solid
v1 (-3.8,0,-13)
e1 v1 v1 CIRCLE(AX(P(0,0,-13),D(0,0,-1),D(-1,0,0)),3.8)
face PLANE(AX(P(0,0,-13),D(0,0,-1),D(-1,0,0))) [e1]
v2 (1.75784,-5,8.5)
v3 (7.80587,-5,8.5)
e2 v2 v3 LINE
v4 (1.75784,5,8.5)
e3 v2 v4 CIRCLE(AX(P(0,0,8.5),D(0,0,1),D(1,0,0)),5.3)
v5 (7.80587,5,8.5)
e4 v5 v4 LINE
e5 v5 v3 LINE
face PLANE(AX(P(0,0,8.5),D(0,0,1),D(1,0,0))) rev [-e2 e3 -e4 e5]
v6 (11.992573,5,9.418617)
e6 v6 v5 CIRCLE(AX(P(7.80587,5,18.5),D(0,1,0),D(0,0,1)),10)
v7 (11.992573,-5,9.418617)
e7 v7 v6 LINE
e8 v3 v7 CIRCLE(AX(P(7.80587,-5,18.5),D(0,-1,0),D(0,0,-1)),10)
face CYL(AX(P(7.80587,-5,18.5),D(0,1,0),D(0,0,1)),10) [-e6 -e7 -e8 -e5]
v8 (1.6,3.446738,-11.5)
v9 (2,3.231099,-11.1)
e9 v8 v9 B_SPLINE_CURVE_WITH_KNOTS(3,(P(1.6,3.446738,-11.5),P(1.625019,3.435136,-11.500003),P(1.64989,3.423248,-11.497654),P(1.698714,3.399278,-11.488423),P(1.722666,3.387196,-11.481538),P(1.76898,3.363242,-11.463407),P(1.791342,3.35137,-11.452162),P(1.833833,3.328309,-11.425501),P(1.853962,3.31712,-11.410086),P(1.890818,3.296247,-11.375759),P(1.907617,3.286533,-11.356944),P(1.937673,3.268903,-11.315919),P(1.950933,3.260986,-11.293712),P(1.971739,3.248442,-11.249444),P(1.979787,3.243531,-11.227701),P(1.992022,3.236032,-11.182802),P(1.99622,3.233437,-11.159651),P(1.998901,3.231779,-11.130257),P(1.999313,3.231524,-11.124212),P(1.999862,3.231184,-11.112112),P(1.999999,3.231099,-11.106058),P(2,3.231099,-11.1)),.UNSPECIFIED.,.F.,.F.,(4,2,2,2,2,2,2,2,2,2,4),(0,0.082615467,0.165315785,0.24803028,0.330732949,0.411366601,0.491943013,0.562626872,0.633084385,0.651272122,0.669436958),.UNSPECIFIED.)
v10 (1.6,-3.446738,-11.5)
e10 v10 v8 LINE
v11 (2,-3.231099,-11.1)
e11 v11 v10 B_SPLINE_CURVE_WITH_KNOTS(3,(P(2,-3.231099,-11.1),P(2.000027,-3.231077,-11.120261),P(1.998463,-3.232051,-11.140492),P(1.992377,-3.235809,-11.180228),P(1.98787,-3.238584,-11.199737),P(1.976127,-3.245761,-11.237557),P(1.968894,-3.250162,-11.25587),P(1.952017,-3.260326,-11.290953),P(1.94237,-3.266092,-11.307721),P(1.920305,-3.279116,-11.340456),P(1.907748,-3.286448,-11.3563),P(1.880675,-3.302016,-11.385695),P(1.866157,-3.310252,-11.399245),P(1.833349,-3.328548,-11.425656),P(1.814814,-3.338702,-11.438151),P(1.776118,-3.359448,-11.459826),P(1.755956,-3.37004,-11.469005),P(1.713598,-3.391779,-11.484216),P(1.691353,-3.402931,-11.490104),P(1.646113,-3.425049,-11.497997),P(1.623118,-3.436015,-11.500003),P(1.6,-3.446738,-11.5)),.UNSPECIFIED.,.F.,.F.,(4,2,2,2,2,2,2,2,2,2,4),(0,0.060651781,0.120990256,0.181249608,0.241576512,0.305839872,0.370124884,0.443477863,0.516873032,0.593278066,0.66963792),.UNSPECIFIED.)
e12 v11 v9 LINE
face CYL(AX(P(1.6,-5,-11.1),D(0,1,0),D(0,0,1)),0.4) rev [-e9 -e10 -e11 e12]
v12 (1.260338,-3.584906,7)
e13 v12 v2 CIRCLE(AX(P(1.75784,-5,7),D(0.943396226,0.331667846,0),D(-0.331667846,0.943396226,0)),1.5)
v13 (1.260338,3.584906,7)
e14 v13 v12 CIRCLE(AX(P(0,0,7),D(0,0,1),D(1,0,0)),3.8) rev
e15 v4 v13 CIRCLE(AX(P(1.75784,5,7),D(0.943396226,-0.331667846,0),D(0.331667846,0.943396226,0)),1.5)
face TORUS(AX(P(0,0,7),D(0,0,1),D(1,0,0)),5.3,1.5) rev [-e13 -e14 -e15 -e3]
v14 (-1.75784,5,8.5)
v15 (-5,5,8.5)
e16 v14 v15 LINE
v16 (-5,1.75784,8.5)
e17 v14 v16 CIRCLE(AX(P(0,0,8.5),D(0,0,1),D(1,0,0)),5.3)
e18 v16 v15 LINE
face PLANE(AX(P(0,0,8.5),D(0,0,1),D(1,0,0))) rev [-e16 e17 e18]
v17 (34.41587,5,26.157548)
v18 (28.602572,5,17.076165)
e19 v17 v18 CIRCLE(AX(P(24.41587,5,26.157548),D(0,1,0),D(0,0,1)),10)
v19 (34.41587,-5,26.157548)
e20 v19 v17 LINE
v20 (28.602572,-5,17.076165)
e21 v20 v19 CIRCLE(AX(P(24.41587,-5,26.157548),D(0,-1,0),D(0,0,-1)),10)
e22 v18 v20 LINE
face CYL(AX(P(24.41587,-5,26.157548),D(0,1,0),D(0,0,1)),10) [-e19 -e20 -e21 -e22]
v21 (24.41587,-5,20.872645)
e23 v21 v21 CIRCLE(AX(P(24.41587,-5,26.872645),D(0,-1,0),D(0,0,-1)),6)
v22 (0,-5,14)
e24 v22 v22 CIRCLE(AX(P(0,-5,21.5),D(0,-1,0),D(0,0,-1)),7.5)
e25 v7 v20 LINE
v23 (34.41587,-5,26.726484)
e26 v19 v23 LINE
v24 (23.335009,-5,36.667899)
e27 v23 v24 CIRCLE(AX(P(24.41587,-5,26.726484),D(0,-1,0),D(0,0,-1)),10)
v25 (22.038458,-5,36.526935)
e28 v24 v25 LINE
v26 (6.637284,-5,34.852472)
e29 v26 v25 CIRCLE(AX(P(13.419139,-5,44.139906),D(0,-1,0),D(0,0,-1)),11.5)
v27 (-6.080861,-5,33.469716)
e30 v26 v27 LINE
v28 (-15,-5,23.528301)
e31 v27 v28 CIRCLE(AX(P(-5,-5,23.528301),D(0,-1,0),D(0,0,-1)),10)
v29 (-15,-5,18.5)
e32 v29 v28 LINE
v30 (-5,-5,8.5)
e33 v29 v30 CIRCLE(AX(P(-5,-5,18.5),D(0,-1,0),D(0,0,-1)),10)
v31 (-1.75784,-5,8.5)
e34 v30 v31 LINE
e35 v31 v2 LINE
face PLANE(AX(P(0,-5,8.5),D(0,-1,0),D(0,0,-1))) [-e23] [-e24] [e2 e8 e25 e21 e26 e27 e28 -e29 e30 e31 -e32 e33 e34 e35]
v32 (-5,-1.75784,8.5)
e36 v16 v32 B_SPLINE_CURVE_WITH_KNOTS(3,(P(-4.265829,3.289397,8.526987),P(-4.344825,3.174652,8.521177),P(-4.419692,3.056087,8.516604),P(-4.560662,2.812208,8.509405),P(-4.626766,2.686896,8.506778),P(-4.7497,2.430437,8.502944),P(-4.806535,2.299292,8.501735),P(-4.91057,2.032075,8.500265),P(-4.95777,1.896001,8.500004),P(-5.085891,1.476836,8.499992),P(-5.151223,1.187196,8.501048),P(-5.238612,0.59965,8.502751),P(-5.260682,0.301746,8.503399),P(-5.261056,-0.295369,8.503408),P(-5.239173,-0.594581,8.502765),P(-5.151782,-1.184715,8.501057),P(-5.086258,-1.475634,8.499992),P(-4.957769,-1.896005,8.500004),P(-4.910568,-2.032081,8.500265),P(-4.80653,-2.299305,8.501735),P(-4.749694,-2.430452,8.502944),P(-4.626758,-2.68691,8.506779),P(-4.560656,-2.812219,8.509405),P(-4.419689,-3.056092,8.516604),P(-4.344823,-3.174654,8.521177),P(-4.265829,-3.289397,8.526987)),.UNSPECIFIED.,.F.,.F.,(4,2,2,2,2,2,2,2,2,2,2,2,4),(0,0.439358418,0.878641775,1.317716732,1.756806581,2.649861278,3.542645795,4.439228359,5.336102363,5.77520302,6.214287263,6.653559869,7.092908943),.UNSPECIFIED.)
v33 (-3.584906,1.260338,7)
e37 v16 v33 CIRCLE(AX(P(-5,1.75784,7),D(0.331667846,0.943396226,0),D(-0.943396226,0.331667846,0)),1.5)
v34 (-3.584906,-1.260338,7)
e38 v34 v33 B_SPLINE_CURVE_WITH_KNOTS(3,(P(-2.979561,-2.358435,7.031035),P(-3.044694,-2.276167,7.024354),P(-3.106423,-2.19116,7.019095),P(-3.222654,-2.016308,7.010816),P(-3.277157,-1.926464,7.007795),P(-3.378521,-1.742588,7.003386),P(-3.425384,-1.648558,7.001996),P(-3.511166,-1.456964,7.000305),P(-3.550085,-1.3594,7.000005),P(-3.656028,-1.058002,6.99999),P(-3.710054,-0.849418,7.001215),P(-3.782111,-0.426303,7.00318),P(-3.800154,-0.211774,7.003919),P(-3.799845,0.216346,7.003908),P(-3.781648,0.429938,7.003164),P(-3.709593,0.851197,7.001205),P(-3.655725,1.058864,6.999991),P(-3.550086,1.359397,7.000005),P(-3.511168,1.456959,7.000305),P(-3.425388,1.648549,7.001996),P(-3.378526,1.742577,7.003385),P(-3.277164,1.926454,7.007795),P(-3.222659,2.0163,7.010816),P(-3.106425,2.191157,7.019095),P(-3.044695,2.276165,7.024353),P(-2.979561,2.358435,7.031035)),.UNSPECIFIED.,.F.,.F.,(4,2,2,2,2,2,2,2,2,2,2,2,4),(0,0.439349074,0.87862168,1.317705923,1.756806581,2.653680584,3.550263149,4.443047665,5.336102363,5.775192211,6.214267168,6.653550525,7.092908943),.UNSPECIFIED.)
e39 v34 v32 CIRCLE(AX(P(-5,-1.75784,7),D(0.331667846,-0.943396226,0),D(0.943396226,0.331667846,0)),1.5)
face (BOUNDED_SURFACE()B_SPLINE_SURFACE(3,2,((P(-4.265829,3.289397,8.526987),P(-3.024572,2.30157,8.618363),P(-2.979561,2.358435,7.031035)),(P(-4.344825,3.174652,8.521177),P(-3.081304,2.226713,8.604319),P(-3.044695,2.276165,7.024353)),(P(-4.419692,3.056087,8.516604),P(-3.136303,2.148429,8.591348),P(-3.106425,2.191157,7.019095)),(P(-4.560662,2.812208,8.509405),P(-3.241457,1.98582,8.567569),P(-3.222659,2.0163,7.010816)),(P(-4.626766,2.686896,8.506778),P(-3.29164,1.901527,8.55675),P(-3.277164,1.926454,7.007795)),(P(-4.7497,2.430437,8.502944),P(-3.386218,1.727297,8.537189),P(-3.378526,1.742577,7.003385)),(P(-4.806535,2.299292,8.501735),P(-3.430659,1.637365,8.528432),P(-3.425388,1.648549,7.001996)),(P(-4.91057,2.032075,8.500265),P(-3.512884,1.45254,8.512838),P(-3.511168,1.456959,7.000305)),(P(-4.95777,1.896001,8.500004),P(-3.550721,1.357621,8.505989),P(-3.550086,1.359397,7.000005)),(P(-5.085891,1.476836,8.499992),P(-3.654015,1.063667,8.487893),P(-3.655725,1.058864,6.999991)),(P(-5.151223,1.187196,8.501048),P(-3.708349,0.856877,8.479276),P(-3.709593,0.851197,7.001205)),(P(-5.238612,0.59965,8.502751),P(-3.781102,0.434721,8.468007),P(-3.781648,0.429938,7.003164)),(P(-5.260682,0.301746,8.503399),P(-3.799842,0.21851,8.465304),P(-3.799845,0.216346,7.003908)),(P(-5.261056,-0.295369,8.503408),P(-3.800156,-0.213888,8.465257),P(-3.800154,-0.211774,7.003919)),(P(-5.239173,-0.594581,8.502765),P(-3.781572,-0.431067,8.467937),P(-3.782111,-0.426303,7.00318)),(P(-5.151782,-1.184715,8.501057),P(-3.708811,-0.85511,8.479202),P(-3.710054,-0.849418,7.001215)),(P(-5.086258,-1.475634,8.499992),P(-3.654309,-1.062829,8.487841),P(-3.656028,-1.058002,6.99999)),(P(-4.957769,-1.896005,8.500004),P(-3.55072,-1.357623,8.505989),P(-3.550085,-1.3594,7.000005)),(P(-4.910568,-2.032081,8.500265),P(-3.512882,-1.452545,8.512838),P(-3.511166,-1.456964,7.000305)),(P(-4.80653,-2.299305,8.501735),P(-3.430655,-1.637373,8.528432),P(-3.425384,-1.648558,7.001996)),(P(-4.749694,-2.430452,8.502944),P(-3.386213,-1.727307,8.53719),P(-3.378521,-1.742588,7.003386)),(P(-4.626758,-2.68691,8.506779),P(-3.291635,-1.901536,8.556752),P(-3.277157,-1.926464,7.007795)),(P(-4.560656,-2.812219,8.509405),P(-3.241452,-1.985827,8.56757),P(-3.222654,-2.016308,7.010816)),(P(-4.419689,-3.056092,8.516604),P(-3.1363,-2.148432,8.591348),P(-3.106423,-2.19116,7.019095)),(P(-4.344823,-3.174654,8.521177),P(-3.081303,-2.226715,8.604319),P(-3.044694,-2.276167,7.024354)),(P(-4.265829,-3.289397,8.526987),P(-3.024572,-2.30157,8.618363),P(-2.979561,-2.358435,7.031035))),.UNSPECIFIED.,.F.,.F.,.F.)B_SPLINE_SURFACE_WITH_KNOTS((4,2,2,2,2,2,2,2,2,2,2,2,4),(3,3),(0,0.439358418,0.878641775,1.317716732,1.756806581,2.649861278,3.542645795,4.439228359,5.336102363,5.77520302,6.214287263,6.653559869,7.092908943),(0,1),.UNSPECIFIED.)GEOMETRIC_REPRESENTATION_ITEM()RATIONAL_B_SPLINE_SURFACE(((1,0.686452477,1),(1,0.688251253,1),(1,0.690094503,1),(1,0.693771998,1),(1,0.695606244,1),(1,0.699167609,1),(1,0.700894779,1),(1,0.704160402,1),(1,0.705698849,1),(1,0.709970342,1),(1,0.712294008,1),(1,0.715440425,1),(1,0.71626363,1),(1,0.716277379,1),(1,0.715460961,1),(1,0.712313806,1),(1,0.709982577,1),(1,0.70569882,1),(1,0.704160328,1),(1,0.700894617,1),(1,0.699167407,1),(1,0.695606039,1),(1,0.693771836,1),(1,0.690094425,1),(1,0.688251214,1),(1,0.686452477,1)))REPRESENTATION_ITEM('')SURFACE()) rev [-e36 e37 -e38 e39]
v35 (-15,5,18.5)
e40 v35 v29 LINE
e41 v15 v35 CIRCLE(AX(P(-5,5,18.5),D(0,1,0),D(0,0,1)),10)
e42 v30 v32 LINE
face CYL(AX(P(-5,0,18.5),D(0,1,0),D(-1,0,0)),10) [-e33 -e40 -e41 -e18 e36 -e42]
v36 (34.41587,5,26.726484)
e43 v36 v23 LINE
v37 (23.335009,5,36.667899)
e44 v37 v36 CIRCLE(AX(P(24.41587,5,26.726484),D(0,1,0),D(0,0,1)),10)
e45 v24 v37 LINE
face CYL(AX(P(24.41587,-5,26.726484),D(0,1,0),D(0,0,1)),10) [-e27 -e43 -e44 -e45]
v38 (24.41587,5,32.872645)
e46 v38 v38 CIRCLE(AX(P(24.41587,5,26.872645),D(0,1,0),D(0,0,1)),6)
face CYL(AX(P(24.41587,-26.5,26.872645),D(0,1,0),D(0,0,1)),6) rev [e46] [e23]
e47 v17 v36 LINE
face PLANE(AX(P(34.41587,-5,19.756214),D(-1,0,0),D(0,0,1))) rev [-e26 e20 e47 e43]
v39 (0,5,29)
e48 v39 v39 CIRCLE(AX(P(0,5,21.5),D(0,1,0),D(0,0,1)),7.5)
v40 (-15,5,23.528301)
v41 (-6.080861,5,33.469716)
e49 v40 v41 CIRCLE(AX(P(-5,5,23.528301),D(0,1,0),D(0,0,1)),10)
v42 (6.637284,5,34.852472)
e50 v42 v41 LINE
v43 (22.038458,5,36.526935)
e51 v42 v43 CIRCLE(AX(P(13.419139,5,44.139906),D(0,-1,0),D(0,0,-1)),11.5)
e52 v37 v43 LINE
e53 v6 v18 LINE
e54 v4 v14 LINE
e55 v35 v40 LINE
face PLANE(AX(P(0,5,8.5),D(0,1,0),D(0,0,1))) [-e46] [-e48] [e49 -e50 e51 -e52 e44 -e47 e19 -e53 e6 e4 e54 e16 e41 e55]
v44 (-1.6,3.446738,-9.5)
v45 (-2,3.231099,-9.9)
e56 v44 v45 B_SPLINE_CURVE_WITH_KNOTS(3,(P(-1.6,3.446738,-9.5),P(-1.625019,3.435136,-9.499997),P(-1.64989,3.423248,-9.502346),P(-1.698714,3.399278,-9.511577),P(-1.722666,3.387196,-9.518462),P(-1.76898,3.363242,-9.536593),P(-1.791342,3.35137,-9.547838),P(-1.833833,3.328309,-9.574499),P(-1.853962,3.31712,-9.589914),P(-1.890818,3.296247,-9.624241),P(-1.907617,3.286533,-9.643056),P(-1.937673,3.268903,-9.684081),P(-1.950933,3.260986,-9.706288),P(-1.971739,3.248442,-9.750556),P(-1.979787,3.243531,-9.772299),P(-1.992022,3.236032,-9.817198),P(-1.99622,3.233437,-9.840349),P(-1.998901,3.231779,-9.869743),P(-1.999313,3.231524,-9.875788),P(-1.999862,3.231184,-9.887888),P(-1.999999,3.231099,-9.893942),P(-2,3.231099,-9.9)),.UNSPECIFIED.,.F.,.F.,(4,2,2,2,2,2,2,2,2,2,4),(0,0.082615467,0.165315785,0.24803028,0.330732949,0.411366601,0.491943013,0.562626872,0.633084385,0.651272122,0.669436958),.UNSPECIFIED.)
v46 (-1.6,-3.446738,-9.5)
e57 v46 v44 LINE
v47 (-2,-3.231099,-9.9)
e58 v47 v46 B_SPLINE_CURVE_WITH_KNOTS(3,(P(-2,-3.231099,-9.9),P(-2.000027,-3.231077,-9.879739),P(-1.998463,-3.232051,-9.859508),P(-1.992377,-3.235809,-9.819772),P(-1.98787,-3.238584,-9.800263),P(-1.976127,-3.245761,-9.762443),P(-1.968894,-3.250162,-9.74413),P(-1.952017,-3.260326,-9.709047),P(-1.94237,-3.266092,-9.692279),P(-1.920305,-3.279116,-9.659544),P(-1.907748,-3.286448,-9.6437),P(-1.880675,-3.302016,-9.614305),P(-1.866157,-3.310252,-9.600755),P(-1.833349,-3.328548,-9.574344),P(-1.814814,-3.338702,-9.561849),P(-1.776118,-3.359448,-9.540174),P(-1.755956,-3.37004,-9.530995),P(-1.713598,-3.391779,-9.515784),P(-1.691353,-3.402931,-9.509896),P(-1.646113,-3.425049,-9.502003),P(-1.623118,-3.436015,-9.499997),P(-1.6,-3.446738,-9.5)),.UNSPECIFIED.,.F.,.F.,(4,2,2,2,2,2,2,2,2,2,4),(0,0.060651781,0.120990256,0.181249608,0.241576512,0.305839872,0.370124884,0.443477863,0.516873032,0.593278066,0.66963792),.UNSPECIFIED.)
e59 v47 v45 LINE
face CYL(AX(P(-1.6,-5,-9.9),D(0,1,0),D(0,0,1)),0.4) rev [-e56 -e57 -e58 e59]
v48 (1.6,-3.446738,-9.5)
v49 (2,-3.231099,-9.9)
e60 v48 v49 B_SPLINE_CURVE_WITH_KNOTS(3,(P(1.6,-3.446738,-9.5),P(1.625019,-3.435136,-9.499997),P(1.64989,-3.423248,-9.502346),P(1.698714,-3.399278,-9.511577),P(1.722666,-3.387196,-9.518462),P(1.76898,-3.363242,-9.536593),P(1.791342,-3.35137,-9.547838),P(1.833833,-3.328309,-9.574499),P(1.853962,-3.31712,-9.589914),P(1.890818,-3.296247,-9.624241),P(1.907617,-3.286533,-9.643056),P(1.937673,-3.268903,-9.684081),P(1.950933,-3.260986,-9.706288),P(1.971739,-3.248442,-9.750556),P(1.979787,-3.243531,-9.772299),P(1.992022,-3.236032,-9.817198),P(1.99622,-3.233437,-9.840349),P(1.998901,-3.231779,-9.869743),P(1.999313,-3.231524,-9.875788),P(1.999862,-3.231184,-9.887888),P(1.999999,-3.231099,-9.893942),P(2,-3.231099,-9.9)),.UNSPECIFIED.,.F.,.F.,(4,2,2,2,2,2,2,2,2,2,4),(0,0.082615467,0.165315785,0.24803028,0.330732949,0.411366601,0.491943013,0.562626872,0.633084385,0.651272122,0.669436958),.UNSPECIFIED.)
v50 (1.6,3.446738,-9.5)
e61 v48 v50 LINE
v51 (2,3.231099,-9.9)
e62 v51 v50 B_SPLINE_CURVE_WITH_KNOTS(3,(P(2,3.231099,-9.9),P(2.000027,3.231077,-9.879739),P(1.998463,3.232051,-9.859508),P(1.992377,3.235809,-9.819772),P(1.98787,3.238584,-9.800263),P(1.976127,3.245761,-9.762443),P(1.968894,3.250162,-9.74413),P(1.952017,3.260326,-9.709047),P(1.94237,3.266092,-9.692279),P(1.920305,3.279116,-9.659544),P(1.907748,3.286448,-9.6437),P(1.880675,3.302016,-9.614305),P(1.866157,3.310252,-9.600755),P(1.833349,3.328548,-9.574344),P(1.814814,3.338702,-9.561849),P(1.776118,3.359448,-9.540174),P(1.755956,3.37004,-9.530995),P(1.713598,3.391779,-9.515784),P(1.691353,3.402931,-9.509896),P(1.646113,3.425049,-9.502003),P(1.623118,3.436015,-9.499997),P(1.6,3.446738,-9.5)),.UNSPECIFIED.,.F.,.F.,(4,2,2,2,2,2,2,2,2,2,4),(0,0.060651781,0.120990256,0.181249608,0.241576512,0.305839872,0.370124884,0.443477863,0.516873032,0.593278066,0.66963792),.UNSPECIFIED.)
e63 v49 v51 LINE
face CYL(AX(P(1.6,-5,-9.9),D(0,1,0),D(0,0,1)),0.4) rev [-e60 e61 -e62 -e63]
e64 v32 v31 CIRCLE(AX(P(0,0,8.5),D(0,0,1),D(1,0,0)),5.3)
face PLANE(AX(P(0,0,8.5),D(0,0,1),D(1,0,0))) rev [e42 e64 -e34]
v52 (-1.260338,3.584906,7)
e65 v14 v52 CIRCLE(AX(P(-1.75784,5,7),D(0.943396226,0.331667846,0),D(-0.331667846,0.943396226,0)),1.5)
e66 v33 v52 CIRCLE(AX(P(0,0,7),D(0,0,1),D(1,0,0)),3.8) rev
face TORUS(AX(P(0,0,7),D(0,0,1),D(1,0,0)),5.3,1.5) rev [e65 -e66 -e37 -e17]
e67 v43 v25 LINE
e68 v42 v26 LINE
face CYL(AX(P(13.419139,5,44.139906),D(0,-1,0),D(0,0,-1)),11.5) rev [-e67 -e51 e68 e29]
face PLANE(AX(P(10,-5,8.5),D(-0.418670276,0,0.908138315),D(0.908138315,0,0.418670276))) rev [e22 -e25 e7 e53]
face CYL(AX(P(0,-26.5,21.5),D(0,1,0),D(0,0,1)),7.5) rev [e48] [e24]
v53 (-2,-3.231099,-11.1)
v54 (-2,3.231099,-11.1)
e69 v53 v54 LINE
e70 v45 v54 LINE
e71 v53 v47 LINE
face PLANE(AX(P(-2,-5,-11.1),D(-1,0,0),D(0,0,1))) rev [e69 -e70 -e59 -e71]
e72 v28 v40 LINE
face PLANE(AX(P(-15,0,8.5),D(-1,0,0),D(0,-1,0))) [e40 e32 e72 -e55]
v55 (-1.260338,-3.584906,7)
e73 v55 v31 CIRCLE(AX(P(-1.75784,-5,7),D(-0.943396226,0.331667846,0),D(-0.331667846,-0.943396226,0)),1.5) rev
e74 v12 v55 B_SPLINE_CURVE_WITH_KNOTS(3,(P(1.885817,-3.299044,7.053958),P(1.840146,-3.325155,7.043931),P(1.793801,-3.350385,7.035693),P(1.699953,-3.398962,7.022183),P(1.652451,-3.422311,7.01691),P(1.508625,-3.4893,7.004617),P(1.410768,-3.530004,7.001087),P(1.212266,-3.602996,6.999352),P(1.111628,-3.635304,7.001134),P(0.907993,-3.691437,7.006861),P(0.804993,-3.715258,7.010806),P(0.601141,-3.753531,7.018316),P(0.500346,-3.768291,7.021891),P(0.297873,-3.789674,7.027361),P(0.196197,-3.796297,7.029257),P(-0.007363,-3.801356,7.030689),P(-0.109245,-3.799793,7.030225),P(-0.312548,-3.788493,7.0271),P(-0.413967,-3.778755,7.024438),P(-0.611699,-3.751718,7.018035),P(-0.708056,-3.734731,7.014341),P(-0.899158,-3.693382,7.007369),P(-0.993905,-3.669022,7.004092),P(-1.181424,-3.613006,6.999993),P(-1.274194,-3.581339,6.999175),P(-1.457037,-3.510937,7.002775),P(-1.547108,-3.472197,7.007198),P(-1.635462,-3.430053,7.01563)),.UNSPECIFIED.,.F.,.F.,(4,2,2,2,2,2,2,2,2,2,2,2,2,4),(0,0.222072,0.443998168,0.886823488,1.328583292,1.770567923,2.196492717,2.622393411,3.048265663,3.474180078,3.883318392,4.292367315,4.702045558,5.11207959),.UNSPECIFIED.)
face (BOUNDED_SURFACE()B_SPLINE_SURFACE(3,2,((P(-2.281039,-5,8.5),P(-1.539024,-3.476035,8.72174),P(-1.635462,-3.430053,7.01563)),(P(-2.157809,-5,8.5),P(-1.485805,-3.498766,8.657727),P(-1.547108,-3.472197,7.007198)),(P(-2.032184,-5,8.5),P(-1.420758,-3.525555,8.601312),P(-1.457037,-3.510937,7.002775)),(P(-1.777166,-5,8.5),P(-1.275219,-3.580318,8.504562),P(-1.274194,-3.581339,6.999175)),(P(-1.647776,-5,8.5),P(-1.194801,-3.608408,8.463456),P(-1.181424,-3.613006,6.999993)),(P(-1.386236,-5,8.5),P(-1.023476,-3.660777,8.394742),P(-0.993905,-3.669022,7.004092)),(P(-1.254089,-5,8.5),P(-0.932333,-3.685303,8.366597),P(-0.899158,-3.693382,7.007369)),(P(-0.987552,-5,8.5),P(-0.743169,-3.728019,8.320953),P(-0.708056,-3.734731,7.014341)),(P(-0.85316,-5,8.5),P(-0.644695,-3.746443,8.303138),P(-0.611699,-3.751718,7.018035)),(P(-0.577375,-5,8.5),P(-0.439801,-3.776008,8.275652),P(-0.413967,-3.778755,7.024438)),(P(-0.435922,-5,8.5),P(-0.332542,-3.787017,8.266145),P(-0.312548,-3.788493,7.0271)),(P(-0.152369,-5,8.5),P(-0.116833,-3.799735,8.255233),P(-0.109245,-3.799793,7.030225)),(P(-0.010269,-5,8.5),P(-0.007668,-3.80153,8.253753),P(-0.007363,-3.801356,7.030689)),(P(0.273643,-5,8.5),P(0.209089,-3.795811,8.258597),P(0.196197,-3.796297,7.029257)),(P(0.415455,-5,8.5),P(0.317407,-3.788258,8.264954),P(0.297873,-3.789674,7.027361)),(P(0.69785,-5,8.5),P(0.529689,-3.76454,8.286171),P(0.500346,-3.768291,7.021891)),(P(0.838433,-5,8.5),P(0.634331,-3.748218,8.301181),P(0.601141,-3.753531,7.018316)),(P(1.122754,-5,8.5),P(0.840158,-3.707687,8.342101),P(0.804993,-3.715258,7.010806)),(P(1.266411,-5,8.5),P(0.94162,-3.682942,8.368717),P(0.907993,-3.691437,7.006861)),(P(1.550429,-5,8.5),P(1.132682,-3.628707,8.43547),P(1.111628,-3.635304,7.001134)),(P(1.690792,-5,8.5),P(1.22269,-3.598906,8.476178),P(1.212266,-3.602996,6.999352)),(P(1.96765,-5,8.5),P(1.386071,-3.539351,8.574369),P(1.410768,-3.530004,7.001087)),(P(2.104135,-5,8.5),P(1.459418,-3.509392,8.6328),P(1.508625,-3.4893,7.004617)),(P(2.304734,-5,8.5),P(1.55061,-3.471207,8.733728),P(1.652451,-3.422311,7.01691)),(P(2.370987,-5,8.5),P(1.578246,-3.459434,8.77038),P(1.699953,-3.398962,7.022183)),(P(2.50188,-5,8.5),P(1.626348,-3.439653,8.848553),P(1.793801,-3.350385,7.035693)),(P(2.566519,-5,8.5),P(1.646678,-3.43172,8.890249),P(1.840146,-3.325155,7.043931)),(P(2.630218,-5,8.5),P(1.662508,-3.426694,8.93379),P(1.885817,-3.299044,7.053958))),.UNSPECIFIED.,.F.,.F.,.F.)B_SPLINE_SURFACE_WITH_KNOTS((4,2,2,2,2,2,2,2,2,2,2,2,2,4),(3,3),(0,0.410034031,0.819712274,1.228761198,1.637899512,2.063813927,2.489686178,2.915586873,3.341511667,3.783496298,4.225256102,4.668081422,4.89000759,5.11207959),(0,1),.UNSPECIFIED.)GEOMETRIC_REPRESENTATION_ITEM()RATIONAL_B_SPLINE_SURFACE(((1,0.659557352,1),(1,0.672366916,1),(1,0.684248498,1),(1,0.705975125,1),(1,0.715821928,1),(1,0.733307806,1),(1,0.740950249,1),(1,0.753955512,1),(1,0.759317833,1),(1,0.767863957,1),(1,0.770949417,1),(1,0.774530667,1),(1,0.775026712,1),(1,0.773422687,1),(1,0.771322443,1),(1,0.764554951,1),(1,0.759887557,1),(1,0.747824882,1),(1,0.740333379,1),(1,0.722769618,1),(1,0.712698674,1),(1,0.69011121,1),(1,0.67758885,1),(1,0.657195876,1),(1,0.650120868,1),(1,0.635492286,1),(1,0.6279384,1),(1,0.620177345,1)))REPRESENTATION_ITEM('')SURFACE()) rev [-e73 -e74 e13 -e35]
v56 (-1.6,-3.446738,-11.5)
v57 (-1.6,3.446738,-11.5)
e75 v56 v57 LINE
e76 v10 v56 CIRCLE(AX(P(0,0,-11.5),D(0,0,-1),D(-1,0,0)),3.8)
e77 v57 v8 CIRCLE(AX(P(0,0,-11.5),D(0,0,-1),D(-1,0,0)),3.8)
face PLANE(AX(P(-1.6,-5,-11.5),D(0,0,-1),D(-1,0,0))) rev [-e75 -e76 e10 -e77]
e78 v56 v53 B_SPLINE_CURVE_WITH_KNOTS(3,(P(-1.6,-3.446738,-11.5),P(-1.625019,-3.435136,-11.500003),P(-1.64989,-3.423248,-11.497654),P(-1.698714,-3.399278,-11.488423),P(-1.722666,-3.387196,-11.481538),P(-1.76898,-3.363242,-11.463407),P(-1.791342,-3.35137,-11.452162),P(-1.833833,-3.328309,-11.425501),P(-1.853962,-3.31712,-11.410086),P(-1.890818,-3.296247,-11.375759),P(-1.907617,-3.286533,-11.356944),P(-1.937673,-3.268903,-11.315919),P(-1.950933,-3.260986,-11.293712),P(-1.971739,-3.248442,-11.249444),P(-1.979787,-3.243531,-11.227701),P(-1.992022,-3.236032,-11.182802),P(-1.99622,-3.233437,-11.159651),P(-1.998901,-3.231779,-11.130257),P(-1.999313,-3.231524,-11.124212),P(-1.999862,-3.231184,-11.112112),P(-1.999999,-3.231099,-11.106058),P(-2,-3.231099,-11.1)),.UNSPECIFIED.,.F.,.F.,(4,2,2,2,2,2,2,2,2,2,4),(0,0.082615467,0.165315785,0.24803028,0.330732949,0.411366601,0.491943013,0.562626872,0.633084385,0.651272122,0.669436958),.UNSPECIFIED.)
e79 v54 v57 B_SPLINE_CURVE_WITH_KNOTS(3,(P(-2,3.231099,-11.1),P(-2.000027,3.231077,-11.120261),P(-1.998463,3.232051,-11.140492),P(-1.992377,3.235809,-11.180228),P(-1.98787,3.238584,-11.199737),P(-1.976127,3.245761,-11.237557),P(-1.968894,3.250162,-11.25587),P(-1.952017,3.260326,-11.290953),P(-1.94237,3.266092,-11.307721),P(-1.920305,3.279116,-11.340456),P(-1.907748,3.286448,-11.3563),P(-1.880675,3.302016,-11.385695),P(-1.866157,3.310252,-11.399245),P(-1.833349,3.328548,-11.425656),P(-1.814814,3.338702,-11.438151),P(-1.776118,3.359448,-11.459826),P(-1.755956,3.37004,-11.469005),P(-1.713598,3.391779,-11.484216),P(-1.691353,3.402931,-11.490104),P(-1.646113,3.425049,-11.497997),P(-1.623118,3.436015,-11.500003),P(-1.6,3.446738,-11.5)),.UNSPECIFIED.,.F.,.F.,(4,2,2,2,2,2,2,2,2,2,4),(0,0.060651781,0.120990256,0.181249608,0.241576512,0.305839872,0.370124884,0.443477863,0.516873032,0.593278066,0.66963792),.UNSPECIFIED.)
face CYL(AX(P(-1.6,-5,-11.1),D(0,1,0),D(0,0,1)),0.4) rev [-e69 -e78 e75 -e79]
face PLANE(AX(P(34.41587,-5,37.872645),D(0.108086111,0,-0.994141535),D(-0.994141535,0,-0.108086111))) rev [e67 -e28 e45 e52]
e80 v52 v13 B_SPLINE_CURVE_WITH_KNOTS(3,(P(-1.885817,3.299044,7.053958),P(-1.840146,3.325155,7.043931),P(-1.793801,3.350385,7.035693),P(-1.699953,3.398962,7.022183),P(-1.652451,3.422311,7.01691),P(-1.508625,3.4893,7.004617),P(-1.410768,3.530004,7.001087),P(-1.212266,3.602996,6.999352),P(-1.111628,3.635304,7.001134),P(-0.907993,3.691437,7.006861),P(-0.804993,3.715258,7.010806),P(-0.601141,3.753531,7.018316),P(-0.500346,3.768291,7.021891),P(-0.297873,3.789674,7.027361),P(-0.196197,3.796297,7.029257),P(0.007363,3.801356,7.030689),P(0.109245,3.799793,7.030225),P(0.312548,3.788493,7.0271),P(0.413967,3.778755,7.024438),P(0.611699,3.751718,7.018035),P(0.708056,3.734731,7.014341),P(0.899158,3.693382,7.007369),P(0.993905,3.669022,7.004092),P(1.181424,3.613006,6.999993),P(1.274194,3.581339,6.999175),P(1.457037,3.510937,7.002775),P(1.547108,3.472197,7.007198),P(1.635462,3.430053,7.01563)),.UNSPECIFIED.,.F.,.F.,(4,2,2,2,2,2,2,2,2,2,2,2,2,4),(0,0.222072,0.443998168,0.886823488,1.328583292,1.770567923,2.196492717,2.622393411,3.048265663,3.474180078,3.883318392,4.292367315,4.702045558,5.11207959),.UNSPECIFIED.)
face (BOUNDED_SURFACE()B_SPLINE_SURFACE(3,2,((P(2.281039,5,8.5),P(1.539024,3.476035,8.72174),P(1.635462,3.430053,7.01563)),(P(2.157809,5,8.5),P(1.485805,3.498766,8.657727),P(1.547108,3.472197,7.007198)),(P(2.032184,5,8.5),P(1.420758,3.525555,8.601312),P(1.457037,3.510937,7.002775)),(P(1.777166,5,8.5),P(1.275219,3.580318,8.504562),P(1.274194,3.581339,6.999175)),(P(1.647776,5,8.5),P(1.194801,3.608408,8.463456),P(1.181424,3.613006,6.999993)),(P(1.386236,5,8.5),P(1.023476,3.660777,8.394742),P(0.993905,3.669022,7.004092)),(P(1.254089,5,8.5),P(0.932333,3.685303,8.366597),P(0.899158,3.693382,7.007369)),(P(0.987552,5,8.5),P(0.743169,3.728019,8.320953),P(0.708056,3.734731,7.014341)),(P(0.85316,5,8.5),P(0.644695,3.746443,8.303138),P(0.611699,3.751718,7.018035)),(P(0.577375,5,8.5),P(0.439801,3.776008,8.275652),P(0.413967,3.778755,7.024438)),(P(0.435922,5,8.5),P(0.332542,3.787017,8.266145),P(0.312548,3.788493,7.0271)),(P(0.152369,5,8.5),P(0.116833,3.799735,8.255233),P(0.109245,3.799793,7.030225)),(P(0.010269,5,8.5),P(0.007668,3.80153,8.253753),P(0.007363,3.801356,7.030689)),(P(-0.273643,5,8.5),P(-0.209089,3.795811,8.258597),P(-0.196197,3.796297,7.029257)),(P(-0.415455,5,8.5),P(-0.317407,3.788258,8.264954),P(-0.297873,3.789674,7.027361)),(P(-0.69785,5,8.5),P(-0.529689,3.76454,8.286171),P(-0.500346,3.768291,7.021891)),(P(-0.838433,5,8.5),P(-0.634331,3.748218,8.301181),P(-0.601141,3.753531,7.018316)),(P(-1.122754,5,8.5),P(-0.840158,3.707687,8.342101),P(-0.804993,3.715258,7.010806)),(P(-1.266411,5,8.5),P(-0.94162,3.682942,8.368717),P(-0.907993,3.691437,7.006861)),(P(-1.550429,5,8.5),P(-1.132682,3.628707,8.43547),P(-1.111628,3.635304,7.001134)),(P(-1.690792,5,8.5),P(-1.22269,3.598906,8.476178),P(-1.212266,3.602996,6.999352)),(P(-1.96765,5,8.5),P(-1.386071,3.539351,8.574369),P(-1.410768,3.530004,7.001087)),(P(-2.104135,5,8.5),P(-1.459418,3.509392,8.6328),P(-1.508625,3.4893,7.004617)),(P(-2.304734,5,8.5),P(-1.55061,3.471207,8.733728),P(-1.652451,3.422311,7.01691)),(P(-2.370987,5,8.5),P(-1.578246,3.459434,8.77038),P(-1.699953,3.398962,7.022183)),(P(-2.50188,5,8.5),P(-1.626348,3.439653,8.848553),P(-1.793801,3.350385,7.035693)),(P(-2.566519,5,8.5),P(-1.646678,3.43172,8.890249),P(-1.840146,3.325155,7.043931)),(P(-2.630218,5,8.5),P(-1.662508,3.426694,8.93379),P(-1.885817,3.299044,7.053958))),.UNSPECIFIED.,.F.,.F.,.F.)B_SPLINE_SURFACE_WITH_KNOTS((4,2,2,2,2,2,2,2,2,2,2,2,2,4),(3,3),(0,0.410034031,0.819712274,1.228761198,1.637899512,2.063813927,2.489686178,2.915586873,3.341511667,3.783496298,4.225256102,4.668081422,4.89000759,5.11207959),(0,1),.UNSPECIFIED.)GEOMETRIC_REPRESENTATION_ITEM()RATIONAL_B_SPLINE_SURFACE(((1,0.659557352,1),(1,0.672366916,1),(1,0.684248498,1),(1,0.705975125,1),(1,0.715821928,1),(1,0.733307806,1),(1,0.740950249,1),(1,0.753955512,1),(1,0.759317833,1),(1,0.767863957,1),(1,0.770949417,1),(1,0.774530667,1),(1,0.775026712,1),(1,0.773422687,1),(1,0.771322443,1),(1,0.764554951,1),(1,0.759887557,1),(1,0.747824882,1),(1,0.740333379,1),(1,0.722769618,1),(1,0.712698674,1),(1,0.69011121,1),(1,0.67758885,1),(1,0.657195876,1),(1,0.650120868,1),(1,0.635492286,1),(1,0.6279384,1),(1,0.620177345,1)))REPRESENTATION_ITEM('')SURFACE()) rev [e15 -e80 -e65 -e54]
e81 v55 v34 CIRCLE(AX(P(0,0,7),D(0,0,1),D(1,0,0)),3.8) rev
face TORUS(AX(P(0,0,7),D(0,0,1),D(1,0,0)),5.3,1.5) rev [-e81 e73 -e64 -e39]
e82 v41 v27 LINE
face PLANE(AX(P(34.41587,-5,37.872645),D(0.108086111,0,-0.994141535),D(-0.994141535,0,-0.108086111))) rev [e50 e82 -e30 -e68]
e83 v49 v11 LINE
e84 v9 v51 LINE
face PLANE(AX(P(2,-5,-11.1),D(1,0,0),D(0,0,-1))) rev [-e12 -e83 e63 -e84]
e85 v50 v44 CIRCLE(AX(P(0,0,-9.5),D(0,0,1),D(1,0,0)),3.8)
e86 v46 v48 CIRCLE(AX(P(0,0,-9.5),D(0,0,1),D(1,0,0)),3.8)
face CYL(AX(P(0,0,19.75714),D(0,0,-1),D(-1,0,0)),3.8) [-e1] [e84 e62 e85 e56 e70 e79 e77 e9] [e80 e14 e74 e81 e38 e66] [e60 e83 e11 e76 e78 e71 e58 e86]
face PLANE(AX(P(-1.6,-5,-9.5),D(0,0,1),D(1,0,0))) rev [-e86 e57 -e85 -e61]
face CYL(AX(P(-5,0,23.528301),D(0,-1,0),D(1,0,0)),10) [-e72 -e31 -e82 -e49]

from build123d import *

# Parameters (mm, degrees)
SKETCH1_R           = 5
BOSS_EXTRUDE1_DEPTH = 20
SKETCH2_R           = 5
SKETCH2_R_2         = 3.98
CUT_EXTRUDE2_DEPTH  = 8
SKETCH8_R           = 5
BOSS_EXTRUDE2_DEPTH = 20
BOSS_EXTRUDE3_START = -31.5
BOSS_EXTRUDE3_DEPTH = 31.5
BOSS_EXTRUDE4_START = -31.5
BOSS_EXTRUDE4_DEPTH = 31.5
SKETCH12_R          = 7.5
SKETCH12_R_2        = 6
CUT_EXTRUDE3_DEPTH  = 31.5
CUT_EXTRUDE4_DEPTH  = 55.083269132
FILLET1_R           = 10
BOSS_EXTRUDE5_START = 13
SKETCH17_R          = 3.98
BOSS_EXTRUDE5_DEPTH = 13
CUT_EXTRUDE5_DEPTH  = 52.315568407
SKETCH19_R          = 5
SKETCH19_R_2        = 3.98
CUT_EXTRUDE6_DEPTH  = 0.5
SKETCH20_R          = 3.98
SKETCH20_R_2        = 3.8
CUT_EXTRUDE7_DEPTH  = 21.5
FILLET2_R           = 1.5
CUT_EXTRUDE9_DEPTH  = 10


with BuildPart() as part:
    # Sketch1 → Boss-Extrude1 (new body)
    with BuildSketch(Plane.XY):
        Circle(SKETCH1_R)
    extrude(amount=BOSS_EXTRUDE1_DEPTH)

    # Sketch2 → Cut-Extrude2 (cut)
    with BuildSketch(Plane(origin=(0, 0, 0), x_dir=(-1, 0, 0), z_dir=(0, 0, -1))):
        Circle(SKETCH2_R)
        Circle(SKETCH2_R_2, mode=Mode.SUBTRACT)
    extrude(amount=-CUT_EXTRUDE2_DEPTH, mode=Mode.SUBTRACT)

    # Sketch8 → Boss-Extrude2 (add)
    with BuildSketch(Plane.XY.offset(20)):
        with Locations(Location((0, 0, 0), (0, 0, 180))):
            Circle(SKETCH8_R)
    extrude(amount=BOSS_EXTRUDE2_DEPTH)

    # Sketch9 → Boss-Extrude3 (add)
    with BuildSketch(Plane.XY.offset(40).offset(BOSS_EXTRUDE3_START)):
        with BuildLine():
            Line((0, 5), (35, 5))
            Line((35, 5), (35, -5))
            Line((35, -5), (0, -5))
            ThreePointArc((0, -5), (5, 0), (0, 5))
        make_face()
    extrude(amount=BOSS_EXTRUDE3_DEPTH)

    # Sketch10 → Boss-Extrude4 (add)
    with BuildSketch(Plane.XY.offset(40).offset(BOSS_EXTRUDE4_START)):
        with BuildLine():
            ThreePointArc((0, -5), (-5, 0), (0, 5))
            Line((0, 5), (-15, 5))
            Line((-15, 5), (-15, -5))
            Line((-15, -5), (0, -5))
        make_face()
    extrude(amount=BOSS_EXTRUDE4_DEPTH)

    # Sketch12 → Cut-Extrude3 (cut)
    with BuildSketch(Plane(origin=(0, 5, 0), x_dir=(1, 0, 0), z_dir=(0, 1, 0))):
        with Locations(Location((0, -21.5, 0), (0, 0, 270))):
            Circle(SKETCH12_R)
        with Locations(Location((24.415869627, -26.872644634, 0), (0, 0, 270))):
            Circle(SKETCH12_R_2)
    extrude(amount=-CUT_EXTRUDE3_DEPTH, mode=Mode.SUBTRACT)

    # Sketch14 → Cut-Extrude4 (cut, through all)
    with BuildSketch(Plane(origin=(0, 5, 0), x_dir=(1, 0, 0), z_dir=(0, 1, 0))):
        Polygon((-15, -40), (35, -40), (35, -37.368304137), (35, -8.5), (10, -8.5), (34.415869627, -19.756213623), (34.415869627, -37.872644634), (-15, -32.5), align=None)
    extrude(amount=-CUT_EXTRUDE4_DEPTH, mode=Mode.SUBTRACT)

    # Fillet1
    fillet1_edges = [part.edges().sort_by_distance(p)[0] for p in [
        (-15, 0, 8.5),
        (34.415869627, 0, 19.756213623),
        (10, 0, 8.5),
        (-15, 0, 32.5),
        (34.415869627, 0, 37.872644634),
    ]]
    fillet(fillet1_edges, radius=FILLET1_R - 0.0001)  # a hair under: the kernel refuses the full size

    # Sketch17 → Boss-Extrude5 (add)
    with BuildSketch(Plane(origin=(0, 0, 0), x_dir=(-1, 0, 0), z_dir=(0, 0, -1)).offset(BOSS_EXTRUDE5_START)):
        Circle(SKETCH17_R)
    extrude(amount=-BOSS_EXTRUDE5_DEPTH)

    # Sketch18 → Cut-Extrude5 (cut, through all)
    with BuildSketch(Plane(origin=(0, 5, 0), x_dir=(1, 0, 0), z_dir=(0, 1, 0))):
        with BuildLine():
            Line((-1.6, 11.5), (1.6, 11.5))
            ThreePointArc((1.6, 11.5), (1.882842712, 11.382842712), (2, 11.1))
            Line((2, 11.1), (2, 9.9))
            ThreePointArc((2, 9.9), (1.882842712, 9.617157288), (1.6, 9.5))
            Line((1.6, 9.5), (-1.6, 9.5))
            ThreePointArc((-1.6, 9.5), (-1.882842712, 9.617157288), (-2, 9.9))
            Line((-2, 9.9), (-2, 11.1))
            ThreePointArc((-2, 11.1), (-1.882842712, 11.382842712), (-1.6, 11.5))
        make_face()
    extrude(amount=-CUT_EXTRUDE5_DEPTH, mode=Mode.SUBTRACT)

    # Sketch19 → Cut-Extrude6 (cut)
    with BuildSketch(Plane(origin=(0, 0, 8), x_dir=(-1, 0, 0), z_dir=(0, 0, -1))):
        Circle(SKETCH19_R)
        Circle(SKETCH19_R_2, mode=Mode.SUBTRACT)
    extrude(amount=-CUT_EXTRUDE6_DEPTH, mode=Mode.SUBTRACT)

    # Sketch20 → Cut-Extrude7 (cut)
    with BuildSketch(Plane(origin=(0, 0, -13), x_dir=(-1, 0, 0), z_dir=(0, 0, -1))):
        Circle(SKETCH20_R)
        Circle(SKETCH20_R_2, mode=Mode.SUBTRACT)
    extrude(amount=-CUT_EXTRUDE7_DEPTH, mode=Mode.SUBTRACT)

    # Fillet2
    fillet2_edges = [part.edges().sort_by_distance(p)[0] for p in [
        (3.8, 0, 8.5),
    ]]
    fillet(fillet2_edges, radius=FILLET2_R)

    # Sketch21 → Cut-Extrude9 (cut)
    with BuildSketch(Plane.XZ.offset(5)):
        with BuildLine():
            Line((22.038458054, 36.526934554), (6.637283612, 34.852471718))
            ThreePointArc((6.637283612, 34.852471718), (14.662129167, 32.707278529), (22.038458054, 36.526934554))
        make_face()
    extrude(amount=-CUT_EXTRUDE9_DEPTH, mode=Mode.SUBTRACT)


solid = part.part
